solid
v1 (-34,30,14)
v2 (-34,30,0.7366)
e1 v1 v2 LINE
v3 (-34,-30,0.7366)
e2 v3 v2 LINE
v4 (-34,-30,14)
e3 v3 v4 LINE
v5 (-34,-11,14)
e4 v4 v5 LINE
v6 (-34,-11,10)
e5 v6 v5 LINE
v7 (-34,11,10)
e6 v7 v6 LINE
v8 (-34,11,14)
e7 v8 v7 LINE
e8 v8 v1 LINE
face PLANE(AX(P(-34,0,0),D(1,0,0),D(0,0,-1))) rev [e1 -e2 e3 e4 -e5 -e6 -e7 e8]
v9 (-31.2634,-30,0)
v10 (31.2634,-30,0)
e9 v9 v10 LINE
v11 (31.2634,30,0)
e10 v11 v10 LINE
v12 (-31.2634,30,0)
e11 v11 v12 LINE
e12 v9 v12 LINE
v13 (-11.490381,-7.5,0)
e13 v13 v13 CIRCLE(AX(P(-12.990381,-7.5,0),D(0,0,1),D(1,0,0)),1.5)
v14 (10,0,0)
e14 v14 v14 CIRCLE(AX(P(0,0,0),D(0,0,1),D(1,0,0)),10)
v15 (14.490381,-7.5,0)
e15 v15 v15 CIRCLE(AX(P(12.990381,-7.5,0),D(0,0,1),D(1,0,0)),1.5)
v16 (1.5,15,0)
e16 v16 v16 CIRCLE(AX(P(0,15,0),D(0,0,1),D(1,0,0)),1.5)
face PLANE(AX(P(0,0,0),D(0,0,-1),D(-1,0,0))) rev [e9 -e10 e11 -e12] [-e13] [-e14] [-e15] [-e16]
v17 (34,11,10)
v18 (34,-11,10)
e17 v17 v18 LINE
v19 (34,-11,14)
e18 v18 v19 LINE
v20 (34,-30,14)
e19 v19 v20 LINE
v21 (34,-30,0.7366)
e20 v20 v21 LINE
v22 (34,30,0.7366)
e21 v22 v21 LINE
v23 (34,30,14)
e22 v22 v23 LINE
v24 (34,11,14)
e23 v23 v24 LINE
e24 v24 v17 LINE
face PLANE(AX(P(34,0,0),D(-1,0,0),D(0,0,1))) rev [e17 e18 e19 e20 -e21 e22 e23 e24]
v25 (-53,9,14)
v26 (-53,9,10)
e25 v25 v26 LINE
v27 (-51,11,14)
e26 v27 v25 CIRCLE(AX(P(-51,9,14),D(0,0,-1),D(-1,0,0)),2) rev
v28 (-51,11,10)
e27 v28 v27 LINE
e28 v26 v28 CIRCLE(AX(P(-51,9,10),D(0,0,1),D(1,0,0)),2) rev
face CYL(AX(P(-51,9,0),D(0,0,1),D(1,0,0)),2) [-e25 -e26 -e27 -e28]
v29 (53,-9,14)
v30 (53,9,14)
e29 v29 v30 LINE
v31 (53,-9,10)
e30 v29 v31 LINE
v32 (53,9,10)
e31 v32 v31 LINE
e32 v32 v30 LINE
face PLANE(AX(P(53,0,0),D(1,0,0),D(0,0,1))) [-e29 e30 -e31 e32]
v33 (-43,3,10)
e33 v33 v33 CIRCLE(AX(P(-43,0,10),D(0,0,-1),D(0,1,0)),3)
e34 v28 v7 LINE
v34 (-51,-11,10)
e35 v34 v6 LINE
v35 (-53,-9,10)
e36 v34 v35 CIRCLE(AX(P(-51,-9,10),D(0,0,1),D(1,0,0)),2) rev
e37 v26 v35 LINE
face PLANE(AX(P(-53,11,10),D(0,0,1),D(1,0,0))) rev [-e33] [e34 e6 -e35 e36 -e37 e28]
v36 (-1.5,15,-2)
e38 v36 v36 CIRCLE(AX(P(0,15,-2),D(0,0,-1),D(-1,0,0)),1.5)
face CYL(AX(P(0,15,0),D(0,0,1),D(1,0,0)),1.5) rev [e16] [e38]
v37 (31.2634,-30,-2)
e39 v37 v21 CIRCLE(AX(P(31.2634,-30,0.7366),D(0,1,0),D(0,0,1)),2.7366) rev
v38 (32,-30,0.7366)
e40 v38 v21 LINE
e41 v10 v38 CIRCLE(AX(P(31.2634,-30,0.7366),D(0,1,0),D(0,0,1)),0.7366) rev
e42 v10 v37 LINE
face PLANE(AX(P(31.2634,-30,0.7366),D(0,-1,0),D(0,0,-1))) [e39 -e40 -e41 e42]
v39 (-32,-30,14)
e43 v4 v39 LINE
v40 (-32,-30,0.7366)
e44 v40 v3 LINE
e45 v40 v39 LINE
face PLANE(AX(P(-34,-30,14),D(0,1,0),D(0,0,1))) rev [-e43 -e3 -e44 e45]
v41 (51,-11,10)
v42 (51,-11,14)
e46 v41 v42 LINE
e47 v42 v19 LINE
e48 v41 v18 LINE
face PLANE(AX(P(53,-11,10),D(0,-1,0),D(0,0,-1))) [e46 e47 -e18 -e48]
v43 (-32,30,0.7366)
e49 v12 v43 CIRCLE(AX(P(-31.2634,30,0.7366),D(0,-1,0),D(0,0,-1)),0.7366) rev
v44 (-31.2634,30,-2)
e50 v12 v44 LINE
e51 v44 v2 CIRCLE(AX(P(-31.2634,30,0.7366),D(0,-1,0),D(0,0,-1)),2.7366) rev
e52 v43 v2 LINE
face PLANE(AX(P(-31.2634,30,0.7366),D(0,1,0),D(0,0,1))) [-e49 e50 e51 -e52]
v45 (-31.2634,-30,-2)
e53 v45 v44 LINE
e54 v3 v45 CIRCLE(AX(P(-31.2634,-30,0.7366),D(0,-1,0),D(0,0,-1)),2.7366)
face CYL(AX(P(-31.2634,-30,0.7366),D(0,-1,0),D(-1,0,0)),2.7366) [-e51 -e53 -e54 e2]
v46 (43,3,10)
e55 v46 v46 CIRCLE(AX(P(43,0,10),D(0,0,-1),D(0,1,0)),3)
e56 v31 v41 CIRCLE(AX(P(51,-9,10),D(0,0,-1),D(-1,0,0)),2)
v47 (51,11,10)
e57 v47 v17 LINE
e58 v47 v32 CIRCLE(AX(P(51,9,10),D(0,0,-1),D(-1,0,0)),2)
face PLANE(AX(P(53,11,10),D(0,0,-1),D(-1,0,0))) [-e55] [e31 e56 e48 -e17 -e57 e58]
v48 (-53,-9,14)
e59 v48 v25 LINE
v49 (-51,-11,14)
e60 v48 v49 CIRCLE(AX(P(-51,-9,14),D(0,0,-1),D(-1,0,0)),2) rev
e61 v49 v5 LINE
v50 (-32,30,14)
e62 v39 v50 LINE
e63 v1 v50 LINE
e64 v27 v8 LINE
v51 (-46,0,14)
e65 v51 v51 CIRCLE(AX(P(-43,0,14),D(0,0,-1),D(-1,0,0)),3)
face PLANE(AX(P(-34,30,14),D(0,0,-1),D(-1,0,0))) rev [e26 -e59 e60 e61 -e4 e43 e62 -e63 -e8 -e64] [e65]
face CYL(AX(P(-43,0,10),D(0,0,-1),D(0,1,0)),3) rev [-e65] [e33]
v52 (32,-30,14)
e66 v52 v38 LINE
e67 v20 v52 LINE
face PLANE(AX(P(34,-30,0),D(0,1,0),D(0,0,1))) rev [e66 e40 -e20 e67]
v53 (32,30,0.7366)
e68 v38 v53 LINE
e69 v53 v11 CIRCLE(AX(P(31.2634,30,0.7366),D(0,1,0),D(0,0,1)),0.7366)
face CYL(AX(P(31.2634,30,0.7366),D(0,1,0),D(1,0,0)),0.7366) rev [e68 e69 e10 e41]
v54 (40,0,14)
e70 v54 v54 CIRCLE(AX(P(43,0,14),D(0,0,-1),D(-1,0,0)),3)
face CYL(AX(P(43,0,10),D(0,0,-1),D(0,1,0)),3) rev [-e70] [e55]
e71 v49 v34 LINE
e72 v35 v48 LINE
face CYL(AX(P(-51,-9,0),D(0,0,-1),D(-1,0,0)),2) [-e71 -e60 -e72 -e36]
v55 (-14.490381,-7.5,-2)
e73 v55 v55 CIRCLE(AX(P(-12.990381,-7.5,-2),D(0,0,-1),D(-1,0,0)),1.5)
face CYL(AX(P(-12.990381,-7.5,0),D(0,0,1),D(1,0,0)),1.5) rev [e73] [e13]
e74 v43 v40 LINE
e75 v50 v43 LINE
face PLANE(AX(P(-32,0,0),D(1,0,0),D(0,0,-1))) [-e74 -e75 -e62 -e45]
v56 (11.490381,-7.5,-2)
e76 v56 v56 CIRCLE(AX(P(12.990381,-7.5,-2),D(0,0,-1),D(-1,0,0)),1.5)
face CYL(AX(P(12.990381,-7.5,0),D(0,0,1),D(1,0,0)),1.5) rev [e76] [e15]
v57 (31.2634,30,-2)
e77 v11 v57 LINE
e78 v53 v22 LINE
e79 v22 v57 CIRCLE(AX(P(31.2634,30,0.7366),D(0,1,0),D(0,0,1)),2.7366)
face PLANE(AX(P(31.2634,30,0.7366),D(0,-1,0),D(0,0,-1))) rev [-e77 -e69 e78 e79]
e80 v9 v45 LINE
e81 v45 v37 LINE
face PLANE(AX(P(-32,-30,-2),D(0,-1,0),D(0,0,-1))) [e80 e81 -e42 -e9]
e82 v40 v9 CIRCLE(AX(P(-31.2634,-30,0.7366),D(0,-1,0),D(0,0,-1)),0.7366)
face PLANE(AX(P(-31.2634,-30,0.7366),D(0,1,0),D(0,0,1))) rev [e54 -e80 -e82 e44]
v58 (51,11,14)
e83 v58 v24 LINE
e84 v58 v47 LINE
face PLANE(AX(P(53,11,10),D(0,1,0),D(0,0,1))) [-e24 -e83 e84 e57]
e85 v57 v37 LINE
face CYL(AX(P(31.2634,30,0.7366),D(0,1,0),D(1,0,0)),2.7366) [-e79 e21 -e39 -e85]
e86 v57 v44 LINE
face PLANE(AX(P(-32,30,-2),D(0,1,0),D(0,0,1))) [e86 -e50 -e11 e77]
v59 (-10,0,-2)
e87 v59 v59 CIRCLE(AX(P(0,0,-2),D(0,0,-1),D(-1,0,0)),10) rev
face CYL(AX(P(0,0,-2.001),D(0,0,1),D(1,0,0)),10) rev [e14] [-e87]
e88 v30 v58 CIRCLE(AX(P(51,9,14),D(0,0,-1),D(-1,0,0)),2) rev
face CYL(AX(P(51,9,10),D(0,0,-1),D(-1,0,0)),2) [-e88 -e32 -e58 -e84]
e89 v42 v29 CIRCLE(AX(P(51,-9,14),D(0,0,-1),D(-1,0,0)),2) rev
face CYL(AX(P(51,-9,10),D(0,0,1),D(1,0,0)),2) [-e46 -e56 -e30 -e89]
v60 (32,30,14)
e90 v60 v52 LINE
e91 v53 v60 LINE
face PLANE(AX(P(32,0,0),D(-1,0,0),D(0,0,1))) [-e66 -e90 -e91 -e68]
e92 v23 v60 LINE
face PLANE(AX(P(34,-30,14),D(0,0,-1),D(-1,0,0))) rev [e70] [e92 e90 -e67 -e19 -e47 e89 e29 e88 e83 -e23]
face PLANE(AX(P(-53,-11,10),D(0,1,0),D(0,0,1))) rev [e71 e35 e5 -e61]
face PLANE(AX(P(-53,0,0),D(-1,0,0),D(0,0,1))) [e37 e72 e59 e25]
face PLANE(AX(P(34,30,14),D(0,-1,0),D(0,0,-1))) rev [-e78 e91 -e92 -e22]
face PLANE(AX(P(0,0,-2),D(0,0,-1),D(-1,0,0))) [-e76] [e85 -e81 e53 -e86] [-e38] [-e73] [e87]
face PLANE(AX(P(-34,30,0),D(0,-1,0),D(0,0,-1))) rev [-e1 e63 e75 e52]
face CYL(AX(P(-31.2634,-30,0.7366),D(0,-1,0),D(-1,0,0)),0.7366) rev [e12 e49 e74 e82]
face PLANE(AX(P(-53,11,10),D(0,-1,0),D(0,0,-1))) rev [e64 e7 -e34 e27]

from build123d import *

# Parameters (mm, degrees)
SKETCH1_W                      = 64
SKETCH1_H                      = 60
BASE_FLANGE1_DEPTH             = 2
EDGE_FLANGE1_STRIP_W           = 9.4732
EDGE_FLANGE1_STRIP_H           = 2
EDGE_FLANGE1_STRIP_CUT_DEPTH   = 60
EDGE_FLANGE1_STRIP_2_W         = 9.4732
EDGE_FLANGE1_STRIP_2_H         = 2
EDGE_FLANGE1_STRIP_CUT_2_DEPTH = 60
EDGE_FLANGE1_DEPTH             = 60
EDGE_FLANGE1_BEND_DEPTH        = 60
SKETCH12_W                     = 4
SKETCH12_H                     = 22
BOSS_EXTRUDE1_DEPTH            = 19
FILLET1_R                      = 2
FILLET1_OF_MIRROR1_R           = 2
F_6_0MM_DOWEL_HOLE1_D          = 6
F_6_0MM_DOWEL_HOLE1_DEPTH      = 12
F_6_0MM_DOWEL_HOLE1_TIP        = 1.802581857
CUT_EXTRUDE1_REACH             = 64.49
SKETCH19_R                     = 10
CIRPATTERN1_COUNT              = 3


# Sheet-metal steps are written as plain solids
with BuildPart() as part:
    # Sketch1 → Base-Flange1 (new body)
    with BuildSketch(Plane.XY):
        Rectangle(SKETCH1_W, SKETCH1_H)
    extrude(amount=-BASE_FLANGE1_DEPTH)

    # Edge-Flange1 strip (across the edge) → Edge-Flange1 strip cut (cut)
    with BuildSketch(Plane(origin=(-32, 30, 0), x_dir=(1, 0, 0), z_dir=(0, -1, 0))):
        with Locations((-4, -1)):
            Rectangle(EDGE_FLANGE1_STRIP_W, EDGE_FLANGE1_STRIP_H)
    extrude(amount=EDGE_FLANGE1_STRIP_CUT_DEPTH, mode=Mode.SUBTRACT)

    # Edge-Flange1 strip 2 (across the edge) → Edge-Flange1 strip cut 2 (cut)
    with BuildSketch(Plane(origin=(32, -30, 0), x_dir=(-1, 0, 0), z_dir=(0, 1, 0))):
        with Locations((-4, -1)):
            Rectangle(EDGE_FLANGE1_STRIP_2_W, EDGE_FLANGE1_STRIP_2_H)
    extrude(amount=EDGE_FLANGE1_STRIP_CUT_2_DEPTH, mode=Mode.SUBTRACT)

    # Edge-Flange1 section (across the edge) → Edge-Flange1 (add)
    with BuildSketch(Plane(origin=(-32, 30, 0), x_dir=(1, 0, 0), z_dir=(0, -1, 0))):
        with BuildLine():
            Line((-2, 0.7366), (-2, 14))
            Line((-2, 14), (0, 14))
            Line((0, 14), (0, 0.7366))
            ThreePointArc((0, 0.7366), (0.215745145, 0.215745145), (0.7366, 0))
            Line((0.7366, 0), (0.7366, -2))
            ThreePointArc((0.7366, -2), (-1.198468417, -1.198468417), (-2, 0.7366))
        make_face()
    extrude(amount=EDGE_FLANGE1_DEPTH)

    # Edge-Flange1 section 2 (across the edge) → Edge-Flange1 bend (add)
    with BuildSketch(Plane(origin=(32, -30, 0), x_dir=(-1, 0, 0), z_dir=(0, 1, 0))):
        with BuildLine():
            Line((-2, 0.7366), (-2, 14))
            Line((-2, 14), (0, 14))
            Line((0, 14), (0, 0.7366))
            ThreePointArc((0, 0.7366), (0.215745145, 0.215745145), (0.7366, 0))
            Line((0.7366, 0), (0.7366, -2))
            ThreePointArc((0.7366, -2), (-1.198468417, -1.198468417), (-2, 0.7366))
        make_face()
    extrude(amount=EDGE_FLANGE1_BEND_DEPTH)

    # Sketch12 → Boss-Extrude1 (add)
    with BuildSketch(Plane.ZY.offset(34)):
        with Locations((12, 0)):
            Rectangle(SKETCH12_W, SKETCH12_H)
    boss_extrude1 = extrude(amount=BOSS_EXTRUDE1_DEPTH)

    # Fillet1
    fillet1_edges = [part.edges().sort_by_distance(p)[0] for p in [
        (-53, 11, 12),
        (-53, -11, 12),
    ]]
    fillet(fillet1_edges, radius=FILLET1_R)

    # Mirror1: Boss-Extrude1 across plane
    add(boss_extrude1.mirror(Plane(origin=(0, 0, 0), x_dir=(0, 0, 1), z_dir=(1, 0, 0))))

    # Fillet1 of Mirror1
    fillet1_of_mirror1_edges = [part.edges().sort_by_distance(p)[0] for p in [
        (53, 11, 12),
        (53, -11, 12),
    ]]
    fillet(fillet1_of_mirror1_edges, radius=FILLET1_OF_MIRROR1_R)

    # Ø6.0mm Dowel Hole1
    with Locations(Plane(origin=(0, 0, 10), x_dir=(-1, 0, 0), z_dir=(0, 0, -1))):
        with Locations((-43, 0), (43, 0)):
            Hole(F_6_0MM_DOWEL_HOLE1_D / 2, depth=F_6_0MM_DOWEL_HOLE1_DEPTH)
            with Locations((0, 0, -(F_6_0MM_DOWEL_HOLE1_DEPTH + F_6_0MM_DOWEL_HOLE1_TIP / 2))):  # 118° drill point
                Cone(0, F_6_0MM_DOWEL_HOLE1_D / 2, F_6_0MM_DOWEL_HOLE1_TIP, mode=Mode.SUBTRACT)

    # Sketch19 → Cut-Extrude1 (cut, up to next)
    with BuildSketch(Plane.XY, mode=Mode.PRIVATE) as cut_extrude1_sk1:
        Circle(SKETCH19_R)
    cut_extrude1_tool1 = extrude(cut_extrude1_sk1.sketch, amount=-CUT_EXTRUDE1_REACH, mode=Mode.PRIVATE) & part.part
    add(cut_extrude1_tool1.solids().sort_by_distance((0, 0, 0))[0], mode=Mode.SUBTRACT)

    # Sketch20 → Ø3.0mm Dowel Hole1 (revolve, cut)
    with BuildSketch(Plane(origin=(0, 15, 0), x_dir=(0, -1, 0), z_dir=(1, 0, 0))):
        Polygon((0, 0), (0, 12.901290929), (1.5, 12), (1.5, 0), align=None)
    f_3_0mm_dowel_hole1 = revolve(axis=Axis((0, 15, 6.35), (0, 0, -1)), mode=Mode.SUBTRACT)

    # CirPattern1: Ø3.0mm Dowel Hole1 ×3 about axis
    cirpattern1_axis = Axis((0, 0, 0), (0, 0, 1))
    for i in range(1, CIRPATTERN1_COUNT):
        add(f_3_0mm_dowel_hole1.rotate(cirpattern1_axis, i * 360 / CIRPATTERN1_COUNT), mode=Mode.SUBTRACT)


solid = part.part
